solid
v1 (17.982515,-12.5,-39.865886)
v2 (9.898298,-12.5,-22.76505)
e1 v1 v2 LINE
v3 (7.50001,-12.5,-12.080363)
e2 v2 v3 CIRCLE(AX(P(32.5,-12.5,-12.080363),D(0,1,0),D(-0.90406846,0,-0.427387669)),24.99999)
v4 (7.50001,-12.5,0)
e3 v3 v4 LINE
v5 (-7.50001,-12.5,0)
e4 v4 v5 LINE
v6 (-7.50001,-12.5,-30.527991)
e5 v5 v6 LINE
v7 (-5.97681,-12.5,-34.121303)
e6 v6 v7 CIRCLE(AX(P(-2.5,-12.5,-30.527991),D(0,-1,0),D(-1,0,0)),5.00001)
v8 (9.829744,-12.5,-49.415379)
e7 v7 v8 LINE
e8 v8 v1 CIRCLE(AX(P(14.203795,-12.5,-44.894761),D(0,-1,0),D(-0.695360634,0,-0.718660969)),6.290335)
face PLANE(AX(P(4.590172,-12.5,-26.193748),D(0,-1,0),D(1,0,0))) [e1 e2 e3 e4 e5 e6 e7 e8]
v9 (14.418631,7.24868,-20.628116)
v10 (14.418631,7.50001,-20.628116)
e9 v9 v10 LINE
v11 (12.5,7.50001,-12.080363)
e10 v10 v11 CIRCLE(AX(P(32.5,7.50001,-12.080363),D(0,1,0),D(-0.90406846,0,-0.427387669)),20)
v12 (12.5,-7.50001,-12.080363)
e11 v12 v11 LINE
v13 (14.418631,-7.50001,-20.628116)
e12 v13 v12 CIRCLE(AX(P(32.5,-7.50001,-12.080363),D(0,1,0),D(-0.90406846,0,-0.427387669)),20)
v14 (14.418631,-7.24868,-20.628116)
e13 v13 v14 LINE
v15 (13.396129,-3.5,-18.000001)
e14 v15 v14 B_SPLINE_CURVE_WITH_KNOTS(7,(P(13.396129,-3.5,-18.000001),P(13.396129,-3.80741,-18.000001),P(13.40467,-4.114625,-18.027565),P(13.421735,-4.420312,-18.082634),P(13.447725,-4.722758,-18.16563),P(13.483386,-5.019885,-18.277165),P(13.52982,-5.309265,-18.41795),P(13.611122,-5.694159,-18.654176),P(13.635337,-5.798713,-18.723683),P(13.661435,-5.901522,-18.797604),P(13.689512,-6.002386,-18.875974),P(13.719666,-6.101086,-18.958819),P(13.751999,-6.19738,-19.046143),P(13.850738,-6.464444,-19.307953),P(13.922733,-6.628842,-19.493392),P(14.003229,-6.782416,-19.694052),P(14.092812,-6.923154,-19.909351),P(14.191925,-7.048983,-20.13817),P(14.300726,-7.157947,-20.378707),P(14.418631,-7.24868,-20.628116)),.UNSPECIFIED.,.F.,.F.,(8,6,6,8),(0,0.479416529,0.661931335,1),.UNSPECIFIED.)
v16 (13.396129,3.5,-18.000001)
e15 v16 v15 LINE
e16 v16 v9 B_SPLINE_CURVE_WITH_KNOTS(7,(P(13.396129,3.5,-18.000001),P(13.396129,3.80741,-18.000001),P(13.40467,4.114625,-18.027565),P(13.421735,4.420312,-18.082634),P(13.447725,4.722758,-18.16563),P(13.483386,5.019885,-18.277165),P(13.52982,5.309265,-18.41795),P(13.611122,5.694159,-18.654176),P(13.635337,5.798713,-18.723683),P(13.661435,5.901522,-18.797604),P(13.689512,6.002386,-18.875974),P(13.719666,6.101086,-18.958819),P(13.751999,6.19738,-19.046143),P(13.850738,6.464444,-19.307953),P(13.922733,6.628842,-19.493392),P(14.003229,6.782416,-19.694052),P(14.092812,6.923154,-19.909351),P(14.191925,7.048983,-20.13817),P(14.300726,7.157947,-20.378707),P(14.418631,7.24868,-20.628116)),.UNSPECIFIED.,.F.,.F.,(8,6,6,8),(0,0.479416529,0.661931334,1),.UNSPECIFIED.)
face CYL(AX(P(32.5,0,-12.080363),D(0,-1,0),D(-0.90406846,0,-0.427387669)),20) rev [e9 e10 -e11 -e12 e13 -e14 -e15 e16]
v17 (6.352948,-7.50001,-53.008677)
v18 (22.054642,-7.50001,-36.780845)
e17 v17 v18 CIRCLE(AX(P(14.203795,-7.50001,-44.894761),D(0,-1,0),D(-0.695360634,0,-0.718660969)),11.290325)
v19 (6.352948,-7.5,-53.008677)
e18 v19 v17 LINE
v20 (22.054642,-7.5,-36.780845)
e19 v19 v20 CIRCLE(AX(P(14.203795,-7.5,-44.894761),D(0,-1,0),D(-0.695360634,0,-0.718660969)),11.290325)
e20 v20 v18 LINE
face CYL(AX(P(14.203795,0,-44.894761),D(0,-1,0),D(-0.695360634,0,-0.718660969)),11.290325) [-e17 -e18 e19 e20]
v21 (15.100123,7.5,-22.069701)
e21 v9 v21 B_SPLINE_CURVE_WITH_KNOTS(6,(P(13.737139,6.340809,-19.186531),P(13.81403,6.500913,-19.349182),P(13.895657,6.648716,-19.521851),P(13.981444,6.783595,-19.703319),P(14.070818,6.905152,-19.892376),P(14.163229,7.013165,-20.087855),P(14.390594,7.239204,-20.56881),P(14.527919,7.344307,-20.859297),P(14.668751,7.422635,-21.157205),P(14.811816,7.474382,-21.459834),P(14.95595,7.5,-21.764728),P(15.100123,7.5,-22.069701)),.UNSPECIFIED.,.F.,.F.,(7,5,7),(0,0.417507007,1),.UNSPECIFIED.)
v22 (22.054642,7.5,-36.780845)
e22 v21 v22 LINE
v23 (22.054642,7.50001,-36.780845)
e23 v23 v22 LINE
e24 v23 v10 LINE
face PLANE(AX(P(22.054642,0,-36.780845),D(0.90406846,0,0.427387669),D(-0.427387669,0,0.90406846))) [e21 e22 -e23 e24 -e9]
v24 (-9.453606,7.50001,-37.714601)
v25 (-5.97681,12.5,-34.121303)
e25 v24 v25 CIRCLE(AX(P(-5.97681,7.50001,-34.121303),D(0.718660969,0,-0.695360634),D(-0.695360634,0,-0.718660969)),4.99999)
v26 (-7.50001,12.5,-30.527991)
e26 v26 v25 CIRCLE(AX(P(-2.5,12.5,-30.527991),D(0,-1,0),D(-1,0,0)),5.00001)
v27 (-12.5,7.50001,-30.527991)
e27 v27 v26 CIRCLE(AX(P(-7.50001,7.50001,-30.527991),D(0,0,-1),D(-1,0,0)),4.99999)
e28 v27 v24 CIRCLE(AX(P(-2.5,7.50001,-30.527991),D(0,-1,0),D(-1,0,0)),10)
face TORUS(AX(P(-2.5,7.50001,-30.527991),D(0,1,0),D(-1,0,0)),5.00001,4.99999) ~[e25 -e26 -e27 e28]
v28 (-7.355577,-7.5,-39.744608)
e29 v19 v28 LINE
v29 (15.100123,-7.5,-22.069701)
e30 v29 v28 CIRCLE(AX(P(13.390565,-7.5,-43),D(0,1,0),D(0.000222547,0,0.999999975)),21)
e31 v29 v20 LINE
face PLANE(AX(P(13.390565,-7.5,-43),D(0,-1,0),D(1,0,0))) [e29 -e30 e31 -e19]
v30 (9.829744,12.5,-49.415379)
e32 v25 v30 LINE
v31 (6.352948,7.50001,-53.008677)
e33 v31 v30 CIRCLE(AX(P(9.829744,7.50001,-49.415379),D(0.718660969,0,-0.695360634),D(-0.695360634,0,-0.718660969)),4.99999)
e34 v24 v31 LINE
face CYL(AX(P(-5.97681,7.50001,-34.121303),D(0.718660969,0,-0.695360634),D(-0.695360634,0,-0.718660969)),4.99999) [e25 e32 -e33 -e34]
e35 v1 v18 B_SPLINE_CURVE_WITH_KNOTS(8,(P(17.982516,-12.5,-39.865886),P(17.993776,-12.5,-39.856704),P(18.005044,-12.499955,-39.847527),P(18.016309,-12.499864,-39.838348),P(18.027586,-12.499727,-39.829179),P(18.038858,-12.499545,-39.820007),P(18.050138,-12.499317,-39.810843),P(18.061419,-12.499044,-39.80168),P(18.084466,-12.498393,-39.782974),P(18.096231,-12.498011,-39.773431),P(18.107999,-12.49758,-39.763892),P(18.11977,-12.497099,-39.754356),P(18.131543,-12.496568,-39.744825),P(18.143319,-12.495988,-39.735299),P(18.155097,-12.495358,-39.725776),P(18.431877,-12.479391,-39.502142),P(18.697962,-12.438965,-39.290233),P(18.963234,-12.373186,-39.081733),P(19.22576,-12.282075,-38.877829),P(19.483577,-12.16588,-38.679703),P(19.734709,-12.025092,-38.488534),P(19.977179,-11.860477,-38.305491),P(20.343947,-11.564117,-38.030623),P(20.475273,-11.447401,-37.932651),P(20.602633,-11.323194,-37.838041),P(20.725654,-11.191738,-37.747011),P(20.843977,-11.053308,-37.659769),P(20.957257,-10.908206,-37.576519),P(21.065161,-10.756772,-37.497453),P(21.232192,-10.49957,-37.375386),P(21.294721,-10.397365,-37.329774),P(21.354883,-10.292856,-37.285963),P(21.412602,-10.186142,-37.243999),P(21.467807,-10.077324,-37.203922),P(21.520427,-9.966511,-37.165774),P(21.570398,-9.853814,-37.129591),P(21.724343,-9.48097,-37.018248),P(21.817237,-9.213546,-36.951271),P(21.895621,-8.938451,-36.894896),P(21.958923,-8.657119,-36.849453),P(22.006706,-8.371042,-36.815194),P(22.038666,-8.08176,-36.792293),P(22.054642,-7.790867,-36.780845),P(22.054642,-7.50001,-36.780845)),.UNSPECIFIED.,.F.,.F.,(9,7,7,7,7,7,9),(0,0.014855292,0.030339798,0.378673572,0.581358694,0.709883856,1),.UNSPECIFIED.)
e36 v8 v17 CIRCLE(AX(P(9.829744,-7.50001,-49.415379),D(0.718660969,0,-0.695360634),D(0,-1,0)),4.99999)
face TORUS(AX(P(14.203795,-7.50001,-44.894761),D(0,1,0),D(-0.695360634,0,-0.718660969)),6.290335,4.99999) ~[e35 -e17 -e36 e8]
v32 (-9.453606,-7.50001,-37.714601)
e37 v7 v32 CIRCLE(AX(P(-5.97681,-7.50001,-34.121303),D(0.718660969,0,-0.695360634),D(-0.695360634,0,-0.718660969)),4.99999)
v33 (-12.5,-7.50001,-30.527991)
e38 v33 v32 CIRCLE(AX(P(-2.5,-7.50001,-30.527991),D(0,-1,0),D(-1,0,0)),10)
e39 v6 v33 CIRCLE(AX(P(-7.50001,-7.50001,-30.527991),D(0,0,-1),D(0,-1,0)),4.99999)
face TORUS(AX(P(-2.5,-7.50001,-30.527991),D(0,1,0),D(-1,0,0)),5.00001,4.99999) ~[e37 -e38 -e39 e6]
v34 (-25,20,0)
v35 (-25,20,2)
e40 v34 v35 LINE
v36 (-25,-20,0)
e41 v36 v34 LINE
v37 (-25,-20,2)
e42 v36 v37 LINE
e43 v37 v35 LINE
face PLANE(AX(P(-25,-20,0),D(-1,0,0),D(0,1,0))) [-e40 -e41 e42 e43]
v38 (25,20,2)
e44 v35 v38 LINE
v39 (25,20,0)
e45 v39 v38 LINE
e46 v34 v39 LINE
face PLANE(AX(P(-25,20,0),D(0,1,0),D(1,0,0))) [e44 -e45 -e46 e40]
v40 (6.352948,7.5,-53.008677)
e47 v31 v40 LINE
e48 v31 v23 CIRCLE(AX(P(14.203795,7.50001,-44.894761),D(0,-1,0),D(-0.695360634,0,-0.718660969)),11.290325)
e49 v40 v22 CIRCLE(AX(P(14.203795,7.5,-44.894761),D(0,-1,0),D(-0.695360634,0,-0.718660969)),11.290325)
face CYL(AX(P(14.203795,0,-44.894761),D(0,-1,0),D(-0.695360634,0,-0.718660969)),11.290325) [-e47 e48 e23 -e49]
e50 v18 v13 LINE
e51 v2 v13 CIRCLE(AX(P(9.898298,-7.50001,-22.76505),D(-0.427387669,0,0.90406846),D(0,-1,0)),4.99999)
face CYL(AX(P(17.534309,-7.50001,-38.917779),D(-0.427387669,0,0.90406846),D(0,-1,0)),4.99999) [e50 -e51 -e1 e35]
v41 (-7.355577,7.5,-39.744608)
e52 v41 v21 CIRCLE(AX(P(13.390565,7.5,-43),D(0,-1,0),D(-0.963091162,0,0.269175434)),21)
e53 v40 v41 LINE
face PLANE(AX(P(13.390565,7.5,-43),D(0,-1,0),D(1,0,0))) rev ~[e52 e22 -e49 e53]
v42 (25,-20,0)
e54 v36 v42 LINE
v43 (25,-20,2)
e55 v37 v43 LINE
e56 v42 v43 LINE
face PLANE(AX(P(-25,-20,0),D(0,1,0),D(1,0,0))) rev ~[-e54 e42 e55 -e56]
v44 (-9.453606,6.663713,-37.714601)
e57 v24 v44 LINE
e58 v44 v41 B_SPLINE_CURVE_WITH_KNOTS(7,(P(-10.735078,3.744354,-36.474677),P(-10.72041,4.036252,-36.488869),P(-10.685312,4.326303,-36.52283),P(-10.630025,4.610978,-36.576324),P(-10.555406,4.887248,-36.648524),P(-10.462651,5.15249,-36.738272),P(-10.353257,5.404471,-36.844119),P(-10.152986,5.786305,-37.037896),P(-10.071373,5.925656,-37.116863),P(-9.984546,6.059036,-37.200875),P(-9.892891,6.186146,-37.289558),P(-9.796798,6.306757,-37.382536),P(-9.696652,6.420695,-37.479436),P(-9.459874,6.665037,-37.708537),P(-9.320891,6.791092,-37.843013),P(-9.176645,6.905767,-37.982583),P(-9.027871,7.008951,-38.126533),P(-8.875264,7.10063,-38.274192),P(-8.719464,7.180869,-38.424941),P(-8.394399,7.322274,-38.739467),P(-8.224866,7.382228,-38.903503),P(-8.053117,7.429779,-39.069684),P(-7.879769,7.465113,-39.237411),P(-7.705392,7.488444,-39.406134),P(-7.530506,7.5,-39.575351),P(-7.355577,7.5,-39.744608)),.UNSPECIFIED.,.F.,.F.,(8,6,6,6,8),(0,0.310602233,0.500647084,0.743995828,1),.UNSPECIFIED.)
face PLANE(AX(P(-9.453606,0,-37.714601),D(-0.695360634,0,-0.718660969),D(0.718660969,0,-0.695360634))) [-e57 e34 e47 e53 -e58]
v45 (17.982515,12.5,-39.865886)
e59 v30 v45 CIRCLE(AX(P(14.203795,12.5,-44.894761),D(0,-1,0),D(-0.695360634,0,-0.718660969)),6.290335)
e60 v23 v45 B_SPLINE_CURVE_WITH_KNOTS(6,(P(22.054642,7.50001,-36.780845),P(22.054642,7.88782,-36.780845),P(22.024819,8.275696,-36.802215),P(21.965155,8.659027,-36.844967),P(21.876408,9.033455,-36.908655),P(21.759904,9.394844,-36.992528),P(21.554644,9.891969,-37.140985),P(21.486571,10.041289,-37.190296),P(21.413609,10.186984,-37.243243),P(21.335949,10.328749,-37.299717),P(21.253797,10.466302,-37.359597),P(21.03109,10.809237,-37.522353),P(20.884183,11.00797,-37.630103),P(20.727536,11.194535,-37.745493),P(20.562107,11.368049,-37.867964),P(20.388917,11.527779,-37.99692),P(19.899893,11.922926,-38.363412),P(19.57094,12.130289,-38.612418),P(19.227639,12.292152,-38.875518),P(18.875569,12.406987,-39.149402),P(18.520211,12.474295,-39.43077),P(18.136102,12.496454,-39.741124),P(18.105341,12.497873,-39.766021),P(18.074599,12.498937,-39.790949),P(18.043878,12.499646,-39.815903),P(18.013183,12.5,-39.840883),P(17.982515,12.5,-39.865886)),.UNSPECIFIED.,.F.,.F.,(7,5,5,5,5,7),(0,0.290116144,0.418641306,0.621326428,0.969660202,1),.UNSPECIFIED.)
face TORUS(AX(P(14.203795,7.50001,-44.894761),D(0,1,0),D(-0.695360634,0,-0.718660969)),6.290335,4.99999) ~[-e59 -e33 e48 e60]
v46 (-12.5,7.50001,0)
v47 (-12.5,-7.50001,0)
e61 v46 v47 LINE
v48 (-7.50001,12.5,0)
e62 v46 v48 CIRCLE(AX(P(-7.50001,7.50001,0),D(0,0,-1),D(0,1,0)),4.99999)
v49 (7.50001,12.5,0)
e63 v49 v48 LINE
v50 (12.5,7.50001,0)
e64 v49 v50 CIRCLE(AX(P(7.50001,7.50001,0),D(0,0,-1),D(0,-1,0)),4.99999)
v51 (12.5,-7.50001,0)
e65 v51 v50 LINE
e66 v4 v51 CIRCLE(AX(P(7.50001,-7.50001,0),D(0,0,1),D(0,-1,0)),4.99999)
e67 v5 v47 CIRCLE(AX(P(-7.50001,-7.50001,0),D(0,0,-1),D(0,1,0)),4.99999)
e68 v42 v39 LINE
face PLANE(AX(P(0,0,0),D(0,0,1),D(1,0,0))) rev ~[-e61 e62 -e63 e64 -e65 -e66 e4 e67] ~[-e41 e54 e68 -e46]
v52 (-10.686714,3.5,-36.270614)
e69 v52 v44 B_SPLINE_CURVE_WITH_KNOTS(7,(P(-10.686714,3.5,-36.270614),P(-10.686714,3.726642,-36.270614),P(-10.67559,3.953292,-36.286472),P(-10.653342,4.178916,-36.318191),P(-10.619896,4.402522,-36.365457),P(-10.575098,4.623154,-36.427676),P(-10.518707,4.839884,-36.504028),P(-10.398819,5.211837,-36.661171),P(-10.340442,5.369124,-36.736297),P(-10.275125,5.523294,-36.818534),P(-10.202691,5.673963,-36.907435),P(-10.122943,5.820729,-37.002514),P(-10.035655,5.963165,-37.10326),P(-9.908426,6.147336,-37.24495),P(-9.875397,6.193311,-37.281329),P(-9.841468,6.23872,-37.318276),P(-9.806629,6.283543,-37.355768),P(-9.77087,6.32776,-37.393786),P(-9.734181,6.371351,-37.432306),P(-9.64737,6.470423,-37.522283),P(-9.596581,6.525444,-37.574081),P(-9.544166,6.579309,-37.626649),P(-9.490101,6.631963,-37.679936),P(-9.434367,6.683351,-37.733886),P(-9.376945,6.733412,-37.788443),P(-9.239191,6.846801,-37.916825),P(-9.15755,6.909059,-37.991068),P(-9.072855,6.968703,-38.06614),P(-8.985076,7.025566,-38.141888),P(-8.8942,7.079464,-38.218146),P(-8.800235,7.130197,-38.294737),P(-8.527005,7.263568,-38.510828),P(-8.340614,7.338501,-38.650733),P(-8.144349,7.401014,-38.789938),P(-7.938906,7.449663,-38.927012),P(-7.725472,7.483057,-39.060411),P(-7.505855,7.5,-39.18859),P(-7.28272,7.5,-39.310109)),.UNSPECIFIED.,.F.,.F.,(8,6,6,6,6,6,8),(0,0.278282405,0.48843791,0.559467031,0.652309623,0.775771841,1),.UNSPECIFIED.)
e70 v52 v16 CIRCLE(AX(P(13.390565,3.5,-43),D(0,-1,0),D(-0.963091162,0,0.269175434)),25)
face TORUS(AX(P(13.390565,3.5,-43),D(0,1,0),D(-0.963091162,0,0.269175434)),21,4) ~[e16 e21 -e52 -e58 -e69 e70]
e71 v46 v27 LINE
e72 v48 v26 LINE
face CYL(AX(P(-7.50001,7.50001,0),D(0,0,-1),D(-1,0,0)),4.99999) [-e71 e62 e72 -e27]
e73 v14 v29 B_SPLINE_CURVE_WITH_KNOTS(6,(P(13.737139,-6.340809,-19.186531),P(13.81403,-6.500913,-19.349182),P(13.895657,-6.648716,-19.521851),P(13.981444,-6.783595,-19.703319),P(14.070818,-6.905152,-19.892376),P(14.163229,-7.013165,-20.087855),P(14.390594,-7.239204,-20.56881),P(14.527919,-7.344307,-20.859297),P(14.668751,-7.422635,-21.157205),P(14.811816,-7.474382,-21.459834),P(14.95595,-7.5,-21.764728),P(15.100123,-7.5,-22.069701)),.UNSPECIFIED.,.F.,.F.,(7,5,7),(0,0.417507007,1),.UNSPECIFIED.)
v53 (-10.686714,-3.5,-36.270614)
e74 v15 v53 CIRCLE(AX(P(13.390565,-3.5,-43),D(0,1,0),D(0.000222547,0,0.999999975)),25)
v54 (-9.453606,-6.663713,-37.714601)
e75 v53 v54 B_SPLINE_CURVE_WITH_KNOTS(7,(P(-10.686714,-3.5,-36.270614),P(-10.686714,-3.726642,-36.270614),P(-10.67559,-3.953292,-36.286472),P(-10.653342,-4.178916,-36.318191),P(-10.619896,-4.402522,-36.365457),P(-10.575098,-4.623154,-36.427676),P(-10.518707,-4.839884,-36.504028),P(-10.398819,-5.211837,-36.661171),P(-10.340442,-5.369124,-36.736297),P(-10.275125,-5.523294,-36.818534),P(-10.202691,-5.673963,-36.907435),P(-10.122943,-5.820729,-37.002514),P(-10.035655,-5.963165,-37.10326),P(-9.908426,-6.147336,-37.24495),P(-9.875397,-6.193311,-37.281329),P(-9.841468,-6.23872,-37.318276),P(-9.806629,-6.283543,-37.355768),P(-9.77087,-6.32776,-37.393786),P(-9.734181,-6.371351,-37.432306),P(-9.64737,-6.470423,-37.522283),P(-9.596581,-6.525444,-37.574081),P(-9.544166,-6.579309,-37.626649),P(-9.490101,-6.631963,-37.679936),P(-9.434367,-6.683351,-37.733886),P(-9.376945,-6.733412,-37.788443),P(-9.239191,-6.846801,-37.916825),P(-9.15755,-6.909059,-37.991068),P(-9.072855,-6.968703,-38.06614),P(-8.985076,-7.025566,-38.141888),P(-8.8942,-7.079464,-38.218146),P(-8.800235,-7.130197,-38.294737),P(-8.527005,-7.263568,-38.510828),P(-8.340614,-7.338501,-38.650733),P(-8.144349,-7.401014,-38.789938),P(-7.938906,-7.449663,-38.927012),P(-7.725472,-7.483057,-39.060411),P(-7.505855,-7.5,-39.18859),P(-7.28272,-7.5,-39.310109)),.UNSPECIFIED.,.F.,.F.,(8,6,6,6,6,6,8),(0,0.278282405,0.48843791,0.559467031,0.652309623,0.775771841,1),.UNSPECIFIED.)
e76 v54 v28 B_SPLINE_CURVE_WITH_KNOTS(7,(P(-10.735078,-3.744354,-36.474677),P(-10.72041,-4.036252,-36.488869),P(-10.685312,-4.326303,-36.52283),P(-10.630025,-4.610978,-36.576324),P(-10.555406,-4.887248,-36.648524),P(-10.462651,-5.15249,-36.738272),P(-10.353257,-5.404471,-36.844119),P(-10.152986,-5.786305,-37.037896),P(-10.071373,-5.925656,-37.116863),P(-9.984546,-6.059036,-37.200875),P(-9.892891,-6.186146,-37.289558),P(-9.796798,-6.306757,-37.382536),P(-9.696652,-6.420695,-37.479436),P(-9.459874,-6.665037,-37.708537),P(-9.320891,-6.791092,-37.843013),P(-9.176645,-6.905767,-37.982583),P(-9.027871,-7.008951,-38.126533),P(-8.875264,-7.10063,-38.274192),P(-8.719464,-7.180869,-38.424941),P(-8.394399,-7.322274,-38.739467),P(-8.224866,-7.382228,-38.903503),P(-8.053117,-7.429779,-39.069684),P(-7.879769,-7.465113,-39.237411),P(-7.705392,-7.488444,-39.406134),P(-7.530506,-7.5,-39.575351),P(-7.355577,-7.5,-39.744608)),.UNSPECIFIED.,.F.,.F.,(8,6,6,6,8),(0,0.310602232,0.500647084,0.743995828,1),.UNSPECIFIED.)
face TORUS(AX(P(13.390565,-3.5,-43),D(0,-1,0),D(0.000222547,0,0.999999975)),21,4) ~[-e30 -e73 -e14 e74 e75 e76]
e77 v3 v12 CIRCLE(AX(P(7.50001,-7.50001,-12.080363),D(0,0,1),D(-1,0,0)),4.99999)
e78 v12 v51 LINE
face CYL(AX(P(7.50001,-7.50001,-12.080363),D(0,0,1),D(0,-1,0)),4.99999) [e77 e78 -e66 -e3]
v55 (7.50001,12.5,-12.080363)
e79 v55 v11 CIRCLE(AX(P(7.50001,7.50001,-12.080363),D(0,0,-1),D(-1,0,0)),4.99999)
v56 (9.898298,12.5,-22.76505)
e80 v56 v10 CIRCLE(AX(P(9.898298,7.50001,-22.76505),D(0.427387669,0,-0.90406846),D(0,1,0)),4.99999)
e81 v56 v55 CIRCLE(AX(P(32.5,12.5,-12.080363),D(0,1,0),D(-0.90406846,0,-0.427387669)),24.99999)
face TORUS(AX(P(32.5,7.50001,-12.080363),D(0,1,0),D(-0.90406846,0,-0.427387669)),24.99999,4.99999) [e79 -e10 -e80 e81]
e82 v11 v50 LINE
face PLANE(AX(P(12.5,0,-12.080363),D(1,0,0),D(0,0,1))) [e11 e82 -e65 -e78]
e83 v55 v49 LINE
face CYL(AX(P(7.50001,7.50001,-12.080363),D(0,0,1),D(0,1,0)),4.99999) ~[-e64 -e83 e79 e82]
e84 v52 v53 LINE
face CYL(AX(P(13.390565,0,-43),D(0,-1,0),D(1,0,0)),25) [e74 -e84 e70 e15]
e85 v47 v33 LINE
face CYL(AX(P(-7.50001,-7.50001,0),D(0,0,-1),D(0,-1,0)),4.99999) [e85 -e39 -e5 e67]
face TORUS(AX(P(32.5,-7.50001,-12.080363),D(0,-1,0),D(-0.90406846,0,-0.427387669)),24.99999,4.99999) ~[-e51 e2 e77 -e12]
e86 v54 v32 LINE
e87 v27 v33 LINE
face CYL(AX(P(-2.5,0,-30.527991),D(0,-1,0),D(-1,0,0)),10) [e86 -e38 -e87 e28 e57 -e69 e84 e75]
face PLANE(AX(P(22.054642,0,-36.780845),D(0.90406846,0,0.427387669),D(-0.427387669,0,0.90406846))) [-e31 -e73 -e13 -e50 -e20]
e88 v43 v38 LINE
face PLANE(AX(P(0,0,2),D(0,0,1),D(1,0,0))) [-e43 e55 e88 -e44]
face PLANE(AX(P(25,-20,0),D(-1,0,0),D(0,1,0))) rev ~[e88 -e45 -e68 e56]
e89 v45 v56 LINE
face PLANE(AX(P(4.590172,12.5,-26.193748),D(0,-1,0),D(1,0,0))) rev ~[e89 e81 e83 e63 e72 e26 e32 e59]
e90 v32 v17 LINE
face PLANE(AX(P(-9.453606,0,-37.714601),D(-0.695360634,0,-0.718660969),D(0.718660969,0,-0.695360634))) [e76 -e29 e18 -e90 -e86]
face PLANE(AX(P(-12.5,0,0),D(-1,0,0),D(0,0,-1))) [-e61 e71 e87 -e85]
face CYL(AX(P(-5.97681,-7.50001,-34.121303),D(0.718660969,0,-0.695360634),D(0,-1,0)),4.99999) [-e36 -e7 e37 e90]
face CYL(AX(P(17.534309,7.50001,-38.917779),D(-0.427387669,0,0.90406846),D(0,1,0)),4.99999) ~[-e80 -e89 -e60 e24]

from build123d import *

# Parameters (mm, degrees)
F0_W     = 50
F0_H     = 40
F1_DEPTH = 2
F3_DEPTH = 12.5
F4_R     = 25
F5_DEPTH = 7.5
F6_R     = 4
F7_R     = 4.99999


# Not quite as in the source:
# - a fillet or chamfer is up to 0.001 mm smaller than in the source, because OpenCascade refuses the exact size


with BuildPart() as f1:
    # F0 (on Top) → F1 (new body)
    with BuildSketch(Plane.XY):
        Rectangle(F0_W, F0_H)
    extrude(amount=F1_DEPTH)

    # F2 (on Front) → F3 (join, symmetric)
    with BuildSketch(Plane.XZ):
        with BuildLine():
            Line((12.5, 0), (-12.5, 0))
            Line((-12.5, 0), (-12.5, -30.5279912201))
            ThreePointArc((-12.5, -30.5279912201), (-11.7069556163, -34.43080665), (-9.4536063441, -37.7146009084))
            Line((-9.4536063441, -37.7146009084), (6.3529476633, -53.0086768346))
            ThreePointArc((6.3529476633, -53.0086768346), (22.3177107814, -52.745608492), (22.0546424389, -36.7808453739))
            Line((22.0546424389, -36.7808453739), (14.4186308033, -20.6281161927))
            ThreePointArc((14.4186308033, -20.6281161927), (12.9855517125, -16.4605806119), (12.5, -12.0803628053))
            Line((12.5, -12.0803628053), (12.5, 0))
        make_face()
    extrude(amount=F3_DEPTH, both=True)

    # F4 (on Front) → F5 (join, symmetric)
    with BuildSketch(Plane.XZ):
        with Locations((13.390565291, -43)):
            Circle(F4_R)
    extrude(amount=F5_DEPTH, both=True)

    # F6
    f6_edges = [f1.edges().sort_by_distance(p)[0] for p in [
        (28.500684, -7.5, -62.916935),
        (28.500684, 7.5, -62.916935),
    ]]
    fillet(f6_edges, radius=F6_R)

    # F7 (radius 5 in the source; OpenCascade refuses exactly that, so slightly less here)
    f7_edges = [f1.edges().sort_by_distance(p)[0] for p in [
        (12.5, -12.5, -6.040181),
        (-12.5, -12.5, -15.263996),
        (-12.5, 12.5, -15.263996),
        (12.5, 12.5, -6.040181),
    ]]
    fillet(f7_edges, radius=F7_R)


solid = f1.part
